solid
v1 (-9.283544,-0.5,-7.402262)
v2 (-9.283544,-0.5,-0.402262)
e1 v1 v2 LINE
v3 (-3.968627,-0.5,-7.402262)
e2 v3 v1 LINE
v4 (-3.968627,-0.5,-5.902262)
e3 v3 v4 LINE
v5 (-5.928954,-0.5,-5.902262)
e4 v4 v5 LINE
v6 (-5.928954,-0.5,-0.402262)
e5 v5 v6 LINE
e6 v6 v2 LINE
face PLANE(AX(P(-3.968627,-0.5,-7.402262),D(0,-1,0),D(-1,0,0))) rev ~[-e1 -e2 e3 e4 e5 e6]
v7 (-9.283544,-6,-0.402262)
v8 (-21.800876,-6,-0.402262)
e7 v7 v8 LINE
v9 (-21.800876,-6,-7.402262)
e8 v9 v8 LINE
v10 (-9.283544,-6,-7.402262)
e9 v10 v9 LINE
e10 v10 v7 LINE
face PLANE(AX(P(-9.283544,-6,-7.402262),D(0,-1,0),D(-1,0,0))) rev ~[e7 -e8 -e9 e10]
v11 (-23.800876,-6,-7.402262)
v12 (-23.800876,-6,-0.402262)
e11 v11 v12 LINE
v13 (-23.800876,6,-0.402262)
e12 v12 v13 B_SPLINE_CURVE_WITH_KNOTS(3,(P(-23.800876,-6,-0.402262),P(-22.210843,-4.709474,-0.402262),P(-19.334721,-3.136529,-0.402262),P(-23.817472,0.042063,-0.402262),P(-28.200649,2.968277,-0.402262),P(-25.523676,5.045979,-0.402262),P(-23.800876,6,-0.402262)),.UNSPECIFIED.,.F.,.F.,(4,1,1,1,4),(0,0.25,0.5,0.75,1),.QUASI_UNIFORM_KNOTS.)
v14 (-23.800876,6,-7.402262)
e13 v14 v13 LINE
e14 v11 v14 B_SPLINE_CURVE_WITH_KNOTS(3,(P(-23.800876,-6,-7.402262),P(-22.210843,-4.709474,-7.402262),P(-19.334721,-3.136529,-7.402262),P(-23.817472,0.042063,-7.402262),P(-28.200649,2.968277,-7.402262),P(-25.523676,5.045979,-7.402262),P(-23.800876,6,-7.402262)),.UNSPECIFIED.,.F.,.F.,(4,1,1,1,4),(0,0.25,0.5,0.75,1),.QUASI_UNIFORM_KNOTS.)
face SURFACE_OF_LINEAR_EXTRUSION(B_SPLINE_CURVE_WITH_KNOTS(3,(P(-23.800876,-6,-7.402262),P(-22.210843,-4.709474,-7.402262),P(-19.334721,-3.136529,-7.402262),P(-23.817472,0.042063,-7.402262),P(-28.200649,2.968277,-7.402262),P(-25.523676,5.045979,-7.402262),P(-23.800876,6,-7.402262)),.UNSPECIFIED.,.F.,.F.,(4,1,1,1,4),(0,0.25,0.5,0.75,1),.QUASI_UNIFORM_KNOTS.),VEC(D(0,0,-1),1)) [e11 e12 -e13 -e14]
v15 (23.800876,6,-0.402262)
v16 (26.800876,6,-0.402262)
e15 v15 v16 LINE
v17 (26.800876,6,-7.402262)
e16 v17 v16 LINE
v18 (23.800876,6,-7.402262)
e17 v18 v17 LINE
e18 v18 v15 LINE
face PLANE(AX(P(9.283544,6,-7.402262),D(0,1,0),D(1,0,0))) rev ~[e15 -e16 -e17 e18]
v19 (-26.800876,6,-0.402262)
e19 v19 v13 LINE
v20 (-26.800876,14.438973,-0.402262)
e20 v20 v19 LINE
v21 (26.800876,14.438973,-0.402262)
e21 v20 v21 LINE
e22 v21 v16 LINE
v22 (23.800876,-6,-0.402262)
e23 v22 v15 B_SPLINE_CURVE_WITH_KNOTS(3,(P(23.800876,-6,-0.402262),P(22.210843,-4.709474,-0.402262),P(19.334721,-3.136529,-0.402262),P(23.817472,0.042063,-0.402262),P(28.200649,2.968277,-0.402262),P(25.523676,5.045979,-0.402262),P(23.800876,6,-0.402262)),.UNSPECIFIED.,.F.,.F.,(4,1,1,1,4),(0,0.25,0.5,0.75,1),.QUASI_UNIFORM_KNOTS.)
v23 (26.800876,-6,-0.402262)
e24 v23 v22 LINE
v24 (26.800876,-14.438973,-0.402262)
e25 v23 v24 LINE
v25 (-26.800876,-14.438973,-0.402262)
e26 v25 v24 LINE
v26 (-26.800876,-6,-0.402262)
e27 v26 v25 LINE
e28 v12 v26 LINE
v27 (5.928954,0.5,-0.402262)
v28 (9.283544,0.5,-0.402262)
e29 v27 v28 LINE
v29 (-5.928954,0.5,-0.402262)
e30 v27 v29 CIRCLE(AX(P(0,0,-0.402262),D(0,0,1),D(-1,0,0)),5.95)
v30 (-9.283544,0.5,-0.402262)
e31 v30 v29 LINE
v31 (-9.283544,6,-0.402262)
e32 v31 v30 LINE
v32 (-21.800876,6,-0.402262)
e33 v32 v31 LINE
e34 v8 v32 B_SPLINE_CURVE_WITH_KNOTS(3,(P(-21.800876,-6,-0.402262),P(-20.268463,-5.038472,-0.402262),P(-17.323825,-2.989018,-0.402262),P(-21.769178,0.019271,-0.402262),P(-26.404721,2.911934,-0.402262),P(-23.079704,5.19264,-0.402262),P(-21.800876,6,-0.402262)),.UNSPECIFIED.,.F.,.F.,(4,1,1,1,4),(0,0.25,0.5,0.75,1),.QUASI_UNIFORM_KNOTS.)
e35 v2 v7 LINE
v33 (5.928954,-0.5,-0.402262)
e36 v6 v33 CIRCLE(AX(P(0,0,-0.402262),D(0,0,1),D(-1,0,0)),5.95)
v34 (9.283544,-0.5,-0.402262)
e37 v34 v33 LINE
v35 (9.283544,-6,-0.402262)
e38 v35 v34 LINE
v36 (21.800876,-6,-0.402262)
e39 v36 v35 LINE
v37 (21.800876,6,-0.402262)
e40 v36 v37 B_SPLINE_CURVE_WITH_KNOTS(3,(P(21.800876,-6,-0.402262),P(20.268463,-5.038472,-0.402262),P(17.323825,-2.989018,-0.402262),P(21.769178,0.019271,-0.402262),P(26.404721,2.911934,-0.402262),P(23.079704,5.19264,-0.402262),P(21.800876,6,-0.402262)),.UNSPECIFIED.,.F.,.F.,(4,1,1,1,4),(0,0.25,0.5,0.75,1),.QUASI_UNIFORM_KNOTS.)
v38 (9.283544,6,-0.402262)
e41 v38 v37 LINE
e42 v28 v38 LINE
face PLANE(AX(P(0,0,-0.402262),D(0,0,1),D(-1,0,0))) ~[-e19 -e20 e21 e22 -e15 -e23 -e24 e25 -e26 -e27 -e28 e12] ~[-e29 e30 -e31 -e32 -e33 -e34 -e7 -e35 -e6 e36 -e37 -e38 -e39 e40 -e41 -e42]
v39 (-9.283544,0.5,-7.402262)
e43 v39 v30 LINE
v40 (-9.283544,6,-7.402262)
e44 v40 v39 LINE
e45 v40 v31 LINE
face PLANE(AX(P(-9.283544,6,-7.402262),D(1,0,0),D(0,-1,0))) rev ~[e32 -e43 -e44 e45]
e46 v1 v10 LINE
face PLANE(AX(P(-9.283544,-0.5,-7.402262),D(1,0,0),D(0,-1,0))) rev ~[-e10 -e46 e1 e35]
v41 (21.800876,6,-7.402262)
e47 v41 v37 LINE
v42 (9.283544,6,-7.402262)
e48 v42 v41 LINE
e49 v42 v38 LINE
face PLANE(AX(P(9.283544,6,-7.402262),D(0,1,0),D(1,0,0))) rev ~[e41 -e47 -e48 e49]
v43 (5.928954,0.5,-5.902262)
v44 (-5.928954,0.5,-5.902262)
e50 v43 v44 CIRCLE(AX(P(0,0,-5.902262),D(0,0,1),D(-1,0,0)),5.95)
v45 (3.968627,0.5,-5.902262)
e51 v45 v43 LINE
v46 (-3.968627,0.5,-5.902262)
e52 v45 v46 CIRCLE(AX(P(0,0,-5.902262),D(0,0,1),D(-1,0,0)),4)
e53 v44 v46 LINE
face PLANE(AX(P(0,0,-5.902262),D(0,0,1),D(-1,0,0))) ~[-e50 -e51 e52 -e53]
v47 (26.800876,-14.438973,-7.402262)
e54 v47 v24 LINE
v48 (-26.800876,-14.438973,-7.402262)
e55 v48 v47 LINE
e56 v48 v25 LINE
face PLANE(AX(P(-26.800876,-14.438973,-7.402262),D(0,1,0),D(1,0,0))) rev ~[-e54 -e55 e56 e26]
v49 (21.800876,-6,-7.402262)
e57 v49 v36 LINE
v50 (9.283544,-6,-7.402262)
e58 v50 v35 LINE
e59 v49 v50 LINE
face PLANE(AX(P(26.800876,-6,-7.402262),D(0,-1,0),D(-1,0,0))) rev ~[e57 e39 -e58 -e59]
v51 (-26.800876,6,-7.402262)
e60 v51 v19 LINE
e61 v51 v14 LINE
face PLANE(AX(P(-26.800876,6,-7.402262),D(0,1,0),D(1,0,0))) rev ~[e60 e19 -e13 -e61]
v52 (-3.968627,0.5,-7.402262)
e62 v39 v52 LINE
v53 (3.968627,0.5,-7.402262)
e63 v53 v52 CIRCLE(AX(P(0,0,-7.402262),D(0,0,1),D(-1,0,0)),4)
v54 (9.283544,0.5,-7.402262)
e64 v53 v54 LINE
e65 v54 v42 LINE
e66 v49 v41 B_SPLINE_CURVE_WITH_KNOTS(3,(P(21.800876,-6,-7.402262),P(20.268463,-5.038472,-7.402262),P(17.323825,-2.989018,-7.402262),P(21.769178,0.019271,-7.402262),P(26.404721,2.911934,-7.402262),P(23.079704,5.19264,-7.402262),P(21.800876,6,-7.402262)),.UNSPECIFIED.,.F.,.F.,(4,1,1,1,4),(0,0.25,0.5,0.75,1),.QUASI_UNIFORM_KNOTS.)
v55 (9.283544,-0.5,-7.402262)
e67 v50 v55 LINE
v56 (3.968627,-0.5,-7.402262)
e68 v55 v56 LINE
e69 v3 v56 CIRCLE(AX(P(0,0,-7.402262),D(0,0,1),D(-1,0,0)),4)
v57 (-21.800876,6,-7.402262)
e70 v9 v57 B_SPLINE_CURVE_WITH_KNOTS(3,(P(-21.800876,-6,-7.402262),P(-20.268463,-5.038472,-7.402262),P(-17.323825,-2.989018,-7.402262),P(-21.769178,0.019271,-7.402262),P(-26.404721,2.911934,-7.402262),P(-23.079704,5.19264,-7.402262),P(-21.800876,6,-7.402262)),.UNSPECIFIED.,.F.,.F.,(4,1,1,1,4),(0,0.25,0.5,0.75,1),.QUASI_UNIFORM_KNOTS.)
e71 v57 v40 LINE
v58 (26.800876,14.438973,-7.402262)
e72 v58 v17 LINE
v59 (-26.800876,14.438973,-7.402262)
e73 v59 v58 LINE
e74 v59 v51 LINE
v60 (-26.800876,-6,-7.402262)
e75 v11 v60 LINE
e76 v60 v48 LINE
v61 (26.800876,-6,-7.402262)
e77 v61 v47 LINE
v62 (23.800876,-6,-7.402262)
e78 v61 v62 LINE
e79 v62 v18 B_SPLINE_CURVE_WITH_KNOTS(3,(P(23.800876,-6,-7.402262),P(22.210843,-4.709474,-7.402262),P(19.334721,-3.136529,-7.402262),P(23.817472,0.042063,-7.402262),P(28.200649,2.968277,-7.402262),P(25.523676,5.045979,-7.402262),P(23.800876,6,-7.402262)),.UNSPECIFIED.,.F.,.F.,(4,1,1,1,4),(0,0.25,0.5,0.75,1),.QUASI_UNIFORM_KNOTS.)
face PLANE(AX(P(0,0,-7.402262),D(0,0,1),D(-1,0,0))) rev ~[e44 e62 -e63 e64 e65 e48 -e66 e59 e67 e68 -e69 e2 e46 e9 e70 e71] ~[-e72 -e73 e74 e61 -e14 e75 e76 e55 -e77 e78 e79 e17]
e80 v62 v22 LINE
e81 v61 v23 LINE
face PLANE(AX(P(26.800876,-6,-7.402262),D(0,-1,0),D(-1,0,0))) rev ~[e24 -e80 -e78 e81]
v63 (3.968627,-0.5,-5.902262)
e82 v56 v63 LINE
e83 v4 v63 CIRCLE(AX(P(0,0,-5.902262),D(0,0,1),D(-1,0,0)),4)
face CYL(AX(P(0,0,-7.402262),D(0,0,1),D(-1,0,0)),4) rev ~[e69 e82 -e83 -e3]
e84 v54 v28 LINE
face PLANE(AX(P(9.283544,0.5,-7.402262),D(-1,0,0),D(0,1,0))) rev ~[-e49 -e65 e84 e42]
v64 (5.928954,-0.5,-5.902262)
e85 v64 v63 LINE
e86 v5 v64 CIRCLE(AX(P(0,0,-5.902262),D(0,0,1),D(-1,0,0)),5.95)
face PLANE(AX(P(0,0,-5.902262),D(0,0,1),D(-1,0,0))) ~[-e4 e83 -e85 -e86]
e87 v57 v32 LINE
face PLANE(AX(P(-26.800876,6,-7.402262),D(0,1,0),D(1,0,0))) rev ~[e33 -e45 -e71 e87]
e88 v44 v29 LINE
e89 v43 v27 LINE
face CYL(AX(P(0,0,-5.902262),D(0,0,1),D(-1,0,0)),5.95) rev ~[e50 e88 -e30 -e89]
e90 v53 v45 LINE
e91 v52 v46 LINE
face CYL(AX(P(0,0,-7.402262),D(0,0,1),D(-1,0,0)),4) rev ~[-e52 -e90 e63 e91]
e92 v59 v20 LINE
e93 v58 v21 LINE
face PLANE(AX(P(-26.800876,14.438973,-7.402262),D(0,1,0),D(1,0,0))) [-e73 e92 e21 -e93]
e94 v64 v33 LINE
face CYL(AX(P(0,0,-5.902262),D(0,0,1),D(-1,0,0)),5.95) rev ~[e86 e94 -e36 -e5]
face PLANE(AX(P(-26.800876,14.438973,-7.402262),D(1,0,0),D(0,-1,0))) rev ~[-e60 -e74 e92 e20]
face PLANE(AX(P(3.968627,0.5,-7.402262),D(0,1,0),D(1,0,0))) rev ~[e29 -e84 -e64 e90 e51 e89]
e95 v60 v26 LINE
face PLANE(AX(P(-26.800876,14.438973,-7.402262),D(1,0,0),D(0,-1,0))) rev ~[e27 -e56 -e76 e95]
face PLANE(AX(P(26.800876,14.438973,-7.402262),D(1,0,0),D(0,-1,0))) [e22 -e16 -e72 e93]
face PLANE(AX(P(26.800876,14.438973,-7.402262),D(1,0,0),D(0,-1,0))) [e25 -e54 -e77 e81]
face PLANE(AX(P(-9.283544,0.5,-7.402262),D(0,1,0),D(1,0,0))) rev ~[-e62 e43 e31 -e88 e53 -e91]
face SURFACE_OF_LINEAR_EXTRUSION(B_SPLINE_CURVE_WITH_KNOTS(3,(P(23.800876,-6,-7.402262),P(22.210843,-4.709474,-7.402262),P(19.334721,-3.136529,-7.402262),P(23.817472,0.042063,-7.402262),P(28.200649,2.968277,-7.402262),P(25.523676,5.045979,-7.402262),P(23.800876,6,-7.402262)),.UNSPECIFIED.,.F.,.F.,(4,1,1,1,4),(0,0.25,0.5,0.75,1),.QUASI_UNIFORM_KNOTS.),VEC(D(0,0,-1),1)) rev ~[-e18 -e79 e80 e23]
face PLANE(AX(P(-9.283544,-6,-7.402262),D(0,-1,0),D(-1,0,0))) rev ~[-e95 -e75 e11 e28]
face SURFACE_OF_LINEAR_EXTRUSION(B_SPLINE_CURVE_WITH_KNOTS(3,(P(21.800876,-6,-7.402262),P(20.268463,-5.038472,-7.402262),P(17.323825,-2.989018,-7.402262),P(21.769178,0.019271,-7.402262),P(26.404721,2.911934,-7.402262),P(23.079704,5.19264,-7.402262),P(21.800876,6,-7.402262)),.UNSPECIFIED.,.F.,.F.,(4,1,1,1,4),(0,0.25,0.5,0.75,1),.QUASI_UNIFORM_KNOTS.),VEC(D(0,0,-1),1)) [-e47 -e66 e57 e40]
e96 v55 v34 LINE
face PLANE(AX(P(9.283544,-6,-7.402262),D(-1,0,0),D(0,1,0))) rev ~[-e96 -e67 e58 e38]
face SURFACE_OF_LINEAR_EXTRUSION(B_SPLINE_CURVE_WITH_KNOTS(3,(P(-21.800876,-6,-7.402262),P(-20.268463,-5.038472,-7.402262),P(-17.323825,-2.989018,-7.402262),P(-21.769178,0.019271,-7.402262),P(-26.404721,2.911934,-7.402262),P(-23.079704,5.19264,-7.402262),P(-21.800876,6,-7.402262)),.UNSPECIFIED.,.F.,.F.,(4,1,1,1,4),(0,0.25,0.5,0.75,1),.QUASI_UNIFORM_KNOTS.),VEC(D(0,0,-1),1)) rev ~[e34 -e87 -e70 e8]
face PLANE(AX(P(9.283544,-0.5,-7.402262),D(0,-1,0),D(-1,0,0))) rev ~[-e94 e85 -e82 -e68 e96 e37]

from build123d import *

# Parameters (mm, degrees)
F2_W     = 113.5670877993
F2_H     = 81.1927579343
F2_R     = 31.9732071905
F2_W_2   = 53.6017529666
F2_H_2   = 28.8779456168
F3_DEPTH = 25
F5_DEPTH = 25
F7_DEPTH = 7


with BuildPart() as f1:
    # F0 (on Front) → F1 (revolve)
    with BuildSketch(Plane.XZ):
        Polygon((-5.95, -0.4022617794), (-31.9732071905, -0.4022617794), (-31.9732071905, -7.4022617794), (-4, -7.4022617794), (-4, -5.9022617794), (-5.95, -5.9022617794), align=None)
    revolve(axis=Axis((0, 0, -6.3669939991), (0, 0, 1)))

    # F2 (on face) → F3 (cut)
    with BuildSketch(Plane(origin=(0, 0, -7.4022617794), x_dir=(1, 0, 0), z_dir=(0, 0, -1))):
        with Locations((1.571347937, -4.5206267387)):
            Rectangle(F2_W, F2_H)
        Circle(F2_R, mode=Mode.SUBTRACT)
        Circle(F2_R)
        Rectangle(F2_W_2, F2_H_2, mode=Mode.SUBTRACT)
    extrude(amount=-F3_DEPTH, mode=Mode.SUBTRACT)

    # F4 (on face) → F5 (cut)
    with BuildSketch(Plane(origin=(0, 0, -7.4022617794), x_dir=(1, 0, 0), z_dir=(0, 0, -1))):
        with BuildLine():
            Line((-3.9686269666, 0.5), (-9.2835435644, 0.5))
            Line((-9.2835435644, 0.5), (-9.2835435644, 6))
            Line((-9.2835435644, 6), (-26.8008764833, 6))
            Line((-26.8008764833, 6), (-26.8008764833, -6))
            Line((-26.8008764833, -6), (-9.2835435644, -6))
            Line((-9.2835435644, -6), (-9.2835435644, -0.5))
            Line((-9.2835435644, -0.5), (-3.9686269666, -0.5))
            ThreePointArc((-3.9686269666, -0.5), (-4, 0), (-3.9686269666, 0.5))
        make_face()
        with BuildLine():
            Line((9.2835435644, 0.5), (3.9686269666, 0.5))
            ThreePointArc((3.9686269666, 0.5), (3.9921490369, 0.2504916502), (4, 0))
            ThreePointArc((4, 0), (3.9921490369, -0.2504916502), (3.9686269666, -0.5))
            Line((3.9686269666, -0.5), (9.2835435644, -0.5))
            Line((9.2835435644, -0.5), (9.2835435644, -6))
            Line((9.2835435644, -6), (26.8008764833, -6))
            Line((26.8008764833, -6), (26.8008764833, 6))
            Line((26.8008764833, 6), (9.2835435644, 6))
            Line((9.2835435644, 6), (9.2835435644, 0.5))
        make_face()
    extrude(amount=-F5_DEPTH, mode=Mode.SUBTRACT)

    # F6 (on face) → F7 (join, through all)
    with BuildSketch(Plane(origin=(0, 0, -7.4022617794), x_dir=(1, 0, 0), z_dir=(0, 0, -1))):
        with BuildLine():
            Line((-21.8008764833, 6), (-23.8008764833, 6))
            add(Edge.make_bspline(
                [(-23.8008764833, 6), (-22.2108428095, 4.7094736127), (-19.3347207095, 3.1365293538), (-23.8174722022, -0.0420631575), (-28.2006493816, -2.9682767239), (-25.523675908, -5.0459788725), (-23.8008764833, -6)],
                knots=[0, 0, 0, 0, 0.25, 0.5, 0.75, 1, 1, 1, 1], degree=3))
            Line((-23.8008764833, -6), (-21.8008764833, -6))
            add(Edge.make_bspline(
                [(-21.8008764833, 6), (-20.2684628372, 5.0384721173), (-17.3238246823, 2.9890179574), (-21.7691782562, -0.0192710268), (-26.4047211931, -2.9119338502), (-23.0797043121, -5.1926403316), (-21.8008764833, -6)],
                knots=[0, 0, 0, 0, 0.25, 0.5, 0.75, 1, 1, 1, 1], degree=3))
        make_face()
        with BuildLine():
            add(Edge.make_bspline(
                [(23.8008764833, 6), (22.2108428095, 4.7094736127), (19.3347207095, 3.1365293538), (23.8174722022, -0.0420631575), (28.2006493816, -2.9682767239), (25.523675908, -5.0459788725), (23.8008764833, -6)],
                knots=[0, 0, 0, 0, 0.25, 0.5, 0.75, 1, 1, 1, 1], degree=3))
            Line((23.8008764833, 6), (21.8008764833, 6))
            add(Edge.make_bspline(
                [(21.8008764833, 6), (20.2684628372, 5.0384721173), (17.3238246823, 2.9890179574), (21.7691782562, -0.0192710268), (26.4047211931, -2.9119338502), (23.0797043121, -5.1926403316), (21.8008764833, -6)],
                knots=[0, 0, 0, 0, 0.25, 0.5, 0.75, 1, 1, 1, 1], degree=3))
            Line((21.8008764833, -6), (23.8008764833, -6))
        make_face()
    extrude(amount=-F7_DEPTH)


solid = f1.part
